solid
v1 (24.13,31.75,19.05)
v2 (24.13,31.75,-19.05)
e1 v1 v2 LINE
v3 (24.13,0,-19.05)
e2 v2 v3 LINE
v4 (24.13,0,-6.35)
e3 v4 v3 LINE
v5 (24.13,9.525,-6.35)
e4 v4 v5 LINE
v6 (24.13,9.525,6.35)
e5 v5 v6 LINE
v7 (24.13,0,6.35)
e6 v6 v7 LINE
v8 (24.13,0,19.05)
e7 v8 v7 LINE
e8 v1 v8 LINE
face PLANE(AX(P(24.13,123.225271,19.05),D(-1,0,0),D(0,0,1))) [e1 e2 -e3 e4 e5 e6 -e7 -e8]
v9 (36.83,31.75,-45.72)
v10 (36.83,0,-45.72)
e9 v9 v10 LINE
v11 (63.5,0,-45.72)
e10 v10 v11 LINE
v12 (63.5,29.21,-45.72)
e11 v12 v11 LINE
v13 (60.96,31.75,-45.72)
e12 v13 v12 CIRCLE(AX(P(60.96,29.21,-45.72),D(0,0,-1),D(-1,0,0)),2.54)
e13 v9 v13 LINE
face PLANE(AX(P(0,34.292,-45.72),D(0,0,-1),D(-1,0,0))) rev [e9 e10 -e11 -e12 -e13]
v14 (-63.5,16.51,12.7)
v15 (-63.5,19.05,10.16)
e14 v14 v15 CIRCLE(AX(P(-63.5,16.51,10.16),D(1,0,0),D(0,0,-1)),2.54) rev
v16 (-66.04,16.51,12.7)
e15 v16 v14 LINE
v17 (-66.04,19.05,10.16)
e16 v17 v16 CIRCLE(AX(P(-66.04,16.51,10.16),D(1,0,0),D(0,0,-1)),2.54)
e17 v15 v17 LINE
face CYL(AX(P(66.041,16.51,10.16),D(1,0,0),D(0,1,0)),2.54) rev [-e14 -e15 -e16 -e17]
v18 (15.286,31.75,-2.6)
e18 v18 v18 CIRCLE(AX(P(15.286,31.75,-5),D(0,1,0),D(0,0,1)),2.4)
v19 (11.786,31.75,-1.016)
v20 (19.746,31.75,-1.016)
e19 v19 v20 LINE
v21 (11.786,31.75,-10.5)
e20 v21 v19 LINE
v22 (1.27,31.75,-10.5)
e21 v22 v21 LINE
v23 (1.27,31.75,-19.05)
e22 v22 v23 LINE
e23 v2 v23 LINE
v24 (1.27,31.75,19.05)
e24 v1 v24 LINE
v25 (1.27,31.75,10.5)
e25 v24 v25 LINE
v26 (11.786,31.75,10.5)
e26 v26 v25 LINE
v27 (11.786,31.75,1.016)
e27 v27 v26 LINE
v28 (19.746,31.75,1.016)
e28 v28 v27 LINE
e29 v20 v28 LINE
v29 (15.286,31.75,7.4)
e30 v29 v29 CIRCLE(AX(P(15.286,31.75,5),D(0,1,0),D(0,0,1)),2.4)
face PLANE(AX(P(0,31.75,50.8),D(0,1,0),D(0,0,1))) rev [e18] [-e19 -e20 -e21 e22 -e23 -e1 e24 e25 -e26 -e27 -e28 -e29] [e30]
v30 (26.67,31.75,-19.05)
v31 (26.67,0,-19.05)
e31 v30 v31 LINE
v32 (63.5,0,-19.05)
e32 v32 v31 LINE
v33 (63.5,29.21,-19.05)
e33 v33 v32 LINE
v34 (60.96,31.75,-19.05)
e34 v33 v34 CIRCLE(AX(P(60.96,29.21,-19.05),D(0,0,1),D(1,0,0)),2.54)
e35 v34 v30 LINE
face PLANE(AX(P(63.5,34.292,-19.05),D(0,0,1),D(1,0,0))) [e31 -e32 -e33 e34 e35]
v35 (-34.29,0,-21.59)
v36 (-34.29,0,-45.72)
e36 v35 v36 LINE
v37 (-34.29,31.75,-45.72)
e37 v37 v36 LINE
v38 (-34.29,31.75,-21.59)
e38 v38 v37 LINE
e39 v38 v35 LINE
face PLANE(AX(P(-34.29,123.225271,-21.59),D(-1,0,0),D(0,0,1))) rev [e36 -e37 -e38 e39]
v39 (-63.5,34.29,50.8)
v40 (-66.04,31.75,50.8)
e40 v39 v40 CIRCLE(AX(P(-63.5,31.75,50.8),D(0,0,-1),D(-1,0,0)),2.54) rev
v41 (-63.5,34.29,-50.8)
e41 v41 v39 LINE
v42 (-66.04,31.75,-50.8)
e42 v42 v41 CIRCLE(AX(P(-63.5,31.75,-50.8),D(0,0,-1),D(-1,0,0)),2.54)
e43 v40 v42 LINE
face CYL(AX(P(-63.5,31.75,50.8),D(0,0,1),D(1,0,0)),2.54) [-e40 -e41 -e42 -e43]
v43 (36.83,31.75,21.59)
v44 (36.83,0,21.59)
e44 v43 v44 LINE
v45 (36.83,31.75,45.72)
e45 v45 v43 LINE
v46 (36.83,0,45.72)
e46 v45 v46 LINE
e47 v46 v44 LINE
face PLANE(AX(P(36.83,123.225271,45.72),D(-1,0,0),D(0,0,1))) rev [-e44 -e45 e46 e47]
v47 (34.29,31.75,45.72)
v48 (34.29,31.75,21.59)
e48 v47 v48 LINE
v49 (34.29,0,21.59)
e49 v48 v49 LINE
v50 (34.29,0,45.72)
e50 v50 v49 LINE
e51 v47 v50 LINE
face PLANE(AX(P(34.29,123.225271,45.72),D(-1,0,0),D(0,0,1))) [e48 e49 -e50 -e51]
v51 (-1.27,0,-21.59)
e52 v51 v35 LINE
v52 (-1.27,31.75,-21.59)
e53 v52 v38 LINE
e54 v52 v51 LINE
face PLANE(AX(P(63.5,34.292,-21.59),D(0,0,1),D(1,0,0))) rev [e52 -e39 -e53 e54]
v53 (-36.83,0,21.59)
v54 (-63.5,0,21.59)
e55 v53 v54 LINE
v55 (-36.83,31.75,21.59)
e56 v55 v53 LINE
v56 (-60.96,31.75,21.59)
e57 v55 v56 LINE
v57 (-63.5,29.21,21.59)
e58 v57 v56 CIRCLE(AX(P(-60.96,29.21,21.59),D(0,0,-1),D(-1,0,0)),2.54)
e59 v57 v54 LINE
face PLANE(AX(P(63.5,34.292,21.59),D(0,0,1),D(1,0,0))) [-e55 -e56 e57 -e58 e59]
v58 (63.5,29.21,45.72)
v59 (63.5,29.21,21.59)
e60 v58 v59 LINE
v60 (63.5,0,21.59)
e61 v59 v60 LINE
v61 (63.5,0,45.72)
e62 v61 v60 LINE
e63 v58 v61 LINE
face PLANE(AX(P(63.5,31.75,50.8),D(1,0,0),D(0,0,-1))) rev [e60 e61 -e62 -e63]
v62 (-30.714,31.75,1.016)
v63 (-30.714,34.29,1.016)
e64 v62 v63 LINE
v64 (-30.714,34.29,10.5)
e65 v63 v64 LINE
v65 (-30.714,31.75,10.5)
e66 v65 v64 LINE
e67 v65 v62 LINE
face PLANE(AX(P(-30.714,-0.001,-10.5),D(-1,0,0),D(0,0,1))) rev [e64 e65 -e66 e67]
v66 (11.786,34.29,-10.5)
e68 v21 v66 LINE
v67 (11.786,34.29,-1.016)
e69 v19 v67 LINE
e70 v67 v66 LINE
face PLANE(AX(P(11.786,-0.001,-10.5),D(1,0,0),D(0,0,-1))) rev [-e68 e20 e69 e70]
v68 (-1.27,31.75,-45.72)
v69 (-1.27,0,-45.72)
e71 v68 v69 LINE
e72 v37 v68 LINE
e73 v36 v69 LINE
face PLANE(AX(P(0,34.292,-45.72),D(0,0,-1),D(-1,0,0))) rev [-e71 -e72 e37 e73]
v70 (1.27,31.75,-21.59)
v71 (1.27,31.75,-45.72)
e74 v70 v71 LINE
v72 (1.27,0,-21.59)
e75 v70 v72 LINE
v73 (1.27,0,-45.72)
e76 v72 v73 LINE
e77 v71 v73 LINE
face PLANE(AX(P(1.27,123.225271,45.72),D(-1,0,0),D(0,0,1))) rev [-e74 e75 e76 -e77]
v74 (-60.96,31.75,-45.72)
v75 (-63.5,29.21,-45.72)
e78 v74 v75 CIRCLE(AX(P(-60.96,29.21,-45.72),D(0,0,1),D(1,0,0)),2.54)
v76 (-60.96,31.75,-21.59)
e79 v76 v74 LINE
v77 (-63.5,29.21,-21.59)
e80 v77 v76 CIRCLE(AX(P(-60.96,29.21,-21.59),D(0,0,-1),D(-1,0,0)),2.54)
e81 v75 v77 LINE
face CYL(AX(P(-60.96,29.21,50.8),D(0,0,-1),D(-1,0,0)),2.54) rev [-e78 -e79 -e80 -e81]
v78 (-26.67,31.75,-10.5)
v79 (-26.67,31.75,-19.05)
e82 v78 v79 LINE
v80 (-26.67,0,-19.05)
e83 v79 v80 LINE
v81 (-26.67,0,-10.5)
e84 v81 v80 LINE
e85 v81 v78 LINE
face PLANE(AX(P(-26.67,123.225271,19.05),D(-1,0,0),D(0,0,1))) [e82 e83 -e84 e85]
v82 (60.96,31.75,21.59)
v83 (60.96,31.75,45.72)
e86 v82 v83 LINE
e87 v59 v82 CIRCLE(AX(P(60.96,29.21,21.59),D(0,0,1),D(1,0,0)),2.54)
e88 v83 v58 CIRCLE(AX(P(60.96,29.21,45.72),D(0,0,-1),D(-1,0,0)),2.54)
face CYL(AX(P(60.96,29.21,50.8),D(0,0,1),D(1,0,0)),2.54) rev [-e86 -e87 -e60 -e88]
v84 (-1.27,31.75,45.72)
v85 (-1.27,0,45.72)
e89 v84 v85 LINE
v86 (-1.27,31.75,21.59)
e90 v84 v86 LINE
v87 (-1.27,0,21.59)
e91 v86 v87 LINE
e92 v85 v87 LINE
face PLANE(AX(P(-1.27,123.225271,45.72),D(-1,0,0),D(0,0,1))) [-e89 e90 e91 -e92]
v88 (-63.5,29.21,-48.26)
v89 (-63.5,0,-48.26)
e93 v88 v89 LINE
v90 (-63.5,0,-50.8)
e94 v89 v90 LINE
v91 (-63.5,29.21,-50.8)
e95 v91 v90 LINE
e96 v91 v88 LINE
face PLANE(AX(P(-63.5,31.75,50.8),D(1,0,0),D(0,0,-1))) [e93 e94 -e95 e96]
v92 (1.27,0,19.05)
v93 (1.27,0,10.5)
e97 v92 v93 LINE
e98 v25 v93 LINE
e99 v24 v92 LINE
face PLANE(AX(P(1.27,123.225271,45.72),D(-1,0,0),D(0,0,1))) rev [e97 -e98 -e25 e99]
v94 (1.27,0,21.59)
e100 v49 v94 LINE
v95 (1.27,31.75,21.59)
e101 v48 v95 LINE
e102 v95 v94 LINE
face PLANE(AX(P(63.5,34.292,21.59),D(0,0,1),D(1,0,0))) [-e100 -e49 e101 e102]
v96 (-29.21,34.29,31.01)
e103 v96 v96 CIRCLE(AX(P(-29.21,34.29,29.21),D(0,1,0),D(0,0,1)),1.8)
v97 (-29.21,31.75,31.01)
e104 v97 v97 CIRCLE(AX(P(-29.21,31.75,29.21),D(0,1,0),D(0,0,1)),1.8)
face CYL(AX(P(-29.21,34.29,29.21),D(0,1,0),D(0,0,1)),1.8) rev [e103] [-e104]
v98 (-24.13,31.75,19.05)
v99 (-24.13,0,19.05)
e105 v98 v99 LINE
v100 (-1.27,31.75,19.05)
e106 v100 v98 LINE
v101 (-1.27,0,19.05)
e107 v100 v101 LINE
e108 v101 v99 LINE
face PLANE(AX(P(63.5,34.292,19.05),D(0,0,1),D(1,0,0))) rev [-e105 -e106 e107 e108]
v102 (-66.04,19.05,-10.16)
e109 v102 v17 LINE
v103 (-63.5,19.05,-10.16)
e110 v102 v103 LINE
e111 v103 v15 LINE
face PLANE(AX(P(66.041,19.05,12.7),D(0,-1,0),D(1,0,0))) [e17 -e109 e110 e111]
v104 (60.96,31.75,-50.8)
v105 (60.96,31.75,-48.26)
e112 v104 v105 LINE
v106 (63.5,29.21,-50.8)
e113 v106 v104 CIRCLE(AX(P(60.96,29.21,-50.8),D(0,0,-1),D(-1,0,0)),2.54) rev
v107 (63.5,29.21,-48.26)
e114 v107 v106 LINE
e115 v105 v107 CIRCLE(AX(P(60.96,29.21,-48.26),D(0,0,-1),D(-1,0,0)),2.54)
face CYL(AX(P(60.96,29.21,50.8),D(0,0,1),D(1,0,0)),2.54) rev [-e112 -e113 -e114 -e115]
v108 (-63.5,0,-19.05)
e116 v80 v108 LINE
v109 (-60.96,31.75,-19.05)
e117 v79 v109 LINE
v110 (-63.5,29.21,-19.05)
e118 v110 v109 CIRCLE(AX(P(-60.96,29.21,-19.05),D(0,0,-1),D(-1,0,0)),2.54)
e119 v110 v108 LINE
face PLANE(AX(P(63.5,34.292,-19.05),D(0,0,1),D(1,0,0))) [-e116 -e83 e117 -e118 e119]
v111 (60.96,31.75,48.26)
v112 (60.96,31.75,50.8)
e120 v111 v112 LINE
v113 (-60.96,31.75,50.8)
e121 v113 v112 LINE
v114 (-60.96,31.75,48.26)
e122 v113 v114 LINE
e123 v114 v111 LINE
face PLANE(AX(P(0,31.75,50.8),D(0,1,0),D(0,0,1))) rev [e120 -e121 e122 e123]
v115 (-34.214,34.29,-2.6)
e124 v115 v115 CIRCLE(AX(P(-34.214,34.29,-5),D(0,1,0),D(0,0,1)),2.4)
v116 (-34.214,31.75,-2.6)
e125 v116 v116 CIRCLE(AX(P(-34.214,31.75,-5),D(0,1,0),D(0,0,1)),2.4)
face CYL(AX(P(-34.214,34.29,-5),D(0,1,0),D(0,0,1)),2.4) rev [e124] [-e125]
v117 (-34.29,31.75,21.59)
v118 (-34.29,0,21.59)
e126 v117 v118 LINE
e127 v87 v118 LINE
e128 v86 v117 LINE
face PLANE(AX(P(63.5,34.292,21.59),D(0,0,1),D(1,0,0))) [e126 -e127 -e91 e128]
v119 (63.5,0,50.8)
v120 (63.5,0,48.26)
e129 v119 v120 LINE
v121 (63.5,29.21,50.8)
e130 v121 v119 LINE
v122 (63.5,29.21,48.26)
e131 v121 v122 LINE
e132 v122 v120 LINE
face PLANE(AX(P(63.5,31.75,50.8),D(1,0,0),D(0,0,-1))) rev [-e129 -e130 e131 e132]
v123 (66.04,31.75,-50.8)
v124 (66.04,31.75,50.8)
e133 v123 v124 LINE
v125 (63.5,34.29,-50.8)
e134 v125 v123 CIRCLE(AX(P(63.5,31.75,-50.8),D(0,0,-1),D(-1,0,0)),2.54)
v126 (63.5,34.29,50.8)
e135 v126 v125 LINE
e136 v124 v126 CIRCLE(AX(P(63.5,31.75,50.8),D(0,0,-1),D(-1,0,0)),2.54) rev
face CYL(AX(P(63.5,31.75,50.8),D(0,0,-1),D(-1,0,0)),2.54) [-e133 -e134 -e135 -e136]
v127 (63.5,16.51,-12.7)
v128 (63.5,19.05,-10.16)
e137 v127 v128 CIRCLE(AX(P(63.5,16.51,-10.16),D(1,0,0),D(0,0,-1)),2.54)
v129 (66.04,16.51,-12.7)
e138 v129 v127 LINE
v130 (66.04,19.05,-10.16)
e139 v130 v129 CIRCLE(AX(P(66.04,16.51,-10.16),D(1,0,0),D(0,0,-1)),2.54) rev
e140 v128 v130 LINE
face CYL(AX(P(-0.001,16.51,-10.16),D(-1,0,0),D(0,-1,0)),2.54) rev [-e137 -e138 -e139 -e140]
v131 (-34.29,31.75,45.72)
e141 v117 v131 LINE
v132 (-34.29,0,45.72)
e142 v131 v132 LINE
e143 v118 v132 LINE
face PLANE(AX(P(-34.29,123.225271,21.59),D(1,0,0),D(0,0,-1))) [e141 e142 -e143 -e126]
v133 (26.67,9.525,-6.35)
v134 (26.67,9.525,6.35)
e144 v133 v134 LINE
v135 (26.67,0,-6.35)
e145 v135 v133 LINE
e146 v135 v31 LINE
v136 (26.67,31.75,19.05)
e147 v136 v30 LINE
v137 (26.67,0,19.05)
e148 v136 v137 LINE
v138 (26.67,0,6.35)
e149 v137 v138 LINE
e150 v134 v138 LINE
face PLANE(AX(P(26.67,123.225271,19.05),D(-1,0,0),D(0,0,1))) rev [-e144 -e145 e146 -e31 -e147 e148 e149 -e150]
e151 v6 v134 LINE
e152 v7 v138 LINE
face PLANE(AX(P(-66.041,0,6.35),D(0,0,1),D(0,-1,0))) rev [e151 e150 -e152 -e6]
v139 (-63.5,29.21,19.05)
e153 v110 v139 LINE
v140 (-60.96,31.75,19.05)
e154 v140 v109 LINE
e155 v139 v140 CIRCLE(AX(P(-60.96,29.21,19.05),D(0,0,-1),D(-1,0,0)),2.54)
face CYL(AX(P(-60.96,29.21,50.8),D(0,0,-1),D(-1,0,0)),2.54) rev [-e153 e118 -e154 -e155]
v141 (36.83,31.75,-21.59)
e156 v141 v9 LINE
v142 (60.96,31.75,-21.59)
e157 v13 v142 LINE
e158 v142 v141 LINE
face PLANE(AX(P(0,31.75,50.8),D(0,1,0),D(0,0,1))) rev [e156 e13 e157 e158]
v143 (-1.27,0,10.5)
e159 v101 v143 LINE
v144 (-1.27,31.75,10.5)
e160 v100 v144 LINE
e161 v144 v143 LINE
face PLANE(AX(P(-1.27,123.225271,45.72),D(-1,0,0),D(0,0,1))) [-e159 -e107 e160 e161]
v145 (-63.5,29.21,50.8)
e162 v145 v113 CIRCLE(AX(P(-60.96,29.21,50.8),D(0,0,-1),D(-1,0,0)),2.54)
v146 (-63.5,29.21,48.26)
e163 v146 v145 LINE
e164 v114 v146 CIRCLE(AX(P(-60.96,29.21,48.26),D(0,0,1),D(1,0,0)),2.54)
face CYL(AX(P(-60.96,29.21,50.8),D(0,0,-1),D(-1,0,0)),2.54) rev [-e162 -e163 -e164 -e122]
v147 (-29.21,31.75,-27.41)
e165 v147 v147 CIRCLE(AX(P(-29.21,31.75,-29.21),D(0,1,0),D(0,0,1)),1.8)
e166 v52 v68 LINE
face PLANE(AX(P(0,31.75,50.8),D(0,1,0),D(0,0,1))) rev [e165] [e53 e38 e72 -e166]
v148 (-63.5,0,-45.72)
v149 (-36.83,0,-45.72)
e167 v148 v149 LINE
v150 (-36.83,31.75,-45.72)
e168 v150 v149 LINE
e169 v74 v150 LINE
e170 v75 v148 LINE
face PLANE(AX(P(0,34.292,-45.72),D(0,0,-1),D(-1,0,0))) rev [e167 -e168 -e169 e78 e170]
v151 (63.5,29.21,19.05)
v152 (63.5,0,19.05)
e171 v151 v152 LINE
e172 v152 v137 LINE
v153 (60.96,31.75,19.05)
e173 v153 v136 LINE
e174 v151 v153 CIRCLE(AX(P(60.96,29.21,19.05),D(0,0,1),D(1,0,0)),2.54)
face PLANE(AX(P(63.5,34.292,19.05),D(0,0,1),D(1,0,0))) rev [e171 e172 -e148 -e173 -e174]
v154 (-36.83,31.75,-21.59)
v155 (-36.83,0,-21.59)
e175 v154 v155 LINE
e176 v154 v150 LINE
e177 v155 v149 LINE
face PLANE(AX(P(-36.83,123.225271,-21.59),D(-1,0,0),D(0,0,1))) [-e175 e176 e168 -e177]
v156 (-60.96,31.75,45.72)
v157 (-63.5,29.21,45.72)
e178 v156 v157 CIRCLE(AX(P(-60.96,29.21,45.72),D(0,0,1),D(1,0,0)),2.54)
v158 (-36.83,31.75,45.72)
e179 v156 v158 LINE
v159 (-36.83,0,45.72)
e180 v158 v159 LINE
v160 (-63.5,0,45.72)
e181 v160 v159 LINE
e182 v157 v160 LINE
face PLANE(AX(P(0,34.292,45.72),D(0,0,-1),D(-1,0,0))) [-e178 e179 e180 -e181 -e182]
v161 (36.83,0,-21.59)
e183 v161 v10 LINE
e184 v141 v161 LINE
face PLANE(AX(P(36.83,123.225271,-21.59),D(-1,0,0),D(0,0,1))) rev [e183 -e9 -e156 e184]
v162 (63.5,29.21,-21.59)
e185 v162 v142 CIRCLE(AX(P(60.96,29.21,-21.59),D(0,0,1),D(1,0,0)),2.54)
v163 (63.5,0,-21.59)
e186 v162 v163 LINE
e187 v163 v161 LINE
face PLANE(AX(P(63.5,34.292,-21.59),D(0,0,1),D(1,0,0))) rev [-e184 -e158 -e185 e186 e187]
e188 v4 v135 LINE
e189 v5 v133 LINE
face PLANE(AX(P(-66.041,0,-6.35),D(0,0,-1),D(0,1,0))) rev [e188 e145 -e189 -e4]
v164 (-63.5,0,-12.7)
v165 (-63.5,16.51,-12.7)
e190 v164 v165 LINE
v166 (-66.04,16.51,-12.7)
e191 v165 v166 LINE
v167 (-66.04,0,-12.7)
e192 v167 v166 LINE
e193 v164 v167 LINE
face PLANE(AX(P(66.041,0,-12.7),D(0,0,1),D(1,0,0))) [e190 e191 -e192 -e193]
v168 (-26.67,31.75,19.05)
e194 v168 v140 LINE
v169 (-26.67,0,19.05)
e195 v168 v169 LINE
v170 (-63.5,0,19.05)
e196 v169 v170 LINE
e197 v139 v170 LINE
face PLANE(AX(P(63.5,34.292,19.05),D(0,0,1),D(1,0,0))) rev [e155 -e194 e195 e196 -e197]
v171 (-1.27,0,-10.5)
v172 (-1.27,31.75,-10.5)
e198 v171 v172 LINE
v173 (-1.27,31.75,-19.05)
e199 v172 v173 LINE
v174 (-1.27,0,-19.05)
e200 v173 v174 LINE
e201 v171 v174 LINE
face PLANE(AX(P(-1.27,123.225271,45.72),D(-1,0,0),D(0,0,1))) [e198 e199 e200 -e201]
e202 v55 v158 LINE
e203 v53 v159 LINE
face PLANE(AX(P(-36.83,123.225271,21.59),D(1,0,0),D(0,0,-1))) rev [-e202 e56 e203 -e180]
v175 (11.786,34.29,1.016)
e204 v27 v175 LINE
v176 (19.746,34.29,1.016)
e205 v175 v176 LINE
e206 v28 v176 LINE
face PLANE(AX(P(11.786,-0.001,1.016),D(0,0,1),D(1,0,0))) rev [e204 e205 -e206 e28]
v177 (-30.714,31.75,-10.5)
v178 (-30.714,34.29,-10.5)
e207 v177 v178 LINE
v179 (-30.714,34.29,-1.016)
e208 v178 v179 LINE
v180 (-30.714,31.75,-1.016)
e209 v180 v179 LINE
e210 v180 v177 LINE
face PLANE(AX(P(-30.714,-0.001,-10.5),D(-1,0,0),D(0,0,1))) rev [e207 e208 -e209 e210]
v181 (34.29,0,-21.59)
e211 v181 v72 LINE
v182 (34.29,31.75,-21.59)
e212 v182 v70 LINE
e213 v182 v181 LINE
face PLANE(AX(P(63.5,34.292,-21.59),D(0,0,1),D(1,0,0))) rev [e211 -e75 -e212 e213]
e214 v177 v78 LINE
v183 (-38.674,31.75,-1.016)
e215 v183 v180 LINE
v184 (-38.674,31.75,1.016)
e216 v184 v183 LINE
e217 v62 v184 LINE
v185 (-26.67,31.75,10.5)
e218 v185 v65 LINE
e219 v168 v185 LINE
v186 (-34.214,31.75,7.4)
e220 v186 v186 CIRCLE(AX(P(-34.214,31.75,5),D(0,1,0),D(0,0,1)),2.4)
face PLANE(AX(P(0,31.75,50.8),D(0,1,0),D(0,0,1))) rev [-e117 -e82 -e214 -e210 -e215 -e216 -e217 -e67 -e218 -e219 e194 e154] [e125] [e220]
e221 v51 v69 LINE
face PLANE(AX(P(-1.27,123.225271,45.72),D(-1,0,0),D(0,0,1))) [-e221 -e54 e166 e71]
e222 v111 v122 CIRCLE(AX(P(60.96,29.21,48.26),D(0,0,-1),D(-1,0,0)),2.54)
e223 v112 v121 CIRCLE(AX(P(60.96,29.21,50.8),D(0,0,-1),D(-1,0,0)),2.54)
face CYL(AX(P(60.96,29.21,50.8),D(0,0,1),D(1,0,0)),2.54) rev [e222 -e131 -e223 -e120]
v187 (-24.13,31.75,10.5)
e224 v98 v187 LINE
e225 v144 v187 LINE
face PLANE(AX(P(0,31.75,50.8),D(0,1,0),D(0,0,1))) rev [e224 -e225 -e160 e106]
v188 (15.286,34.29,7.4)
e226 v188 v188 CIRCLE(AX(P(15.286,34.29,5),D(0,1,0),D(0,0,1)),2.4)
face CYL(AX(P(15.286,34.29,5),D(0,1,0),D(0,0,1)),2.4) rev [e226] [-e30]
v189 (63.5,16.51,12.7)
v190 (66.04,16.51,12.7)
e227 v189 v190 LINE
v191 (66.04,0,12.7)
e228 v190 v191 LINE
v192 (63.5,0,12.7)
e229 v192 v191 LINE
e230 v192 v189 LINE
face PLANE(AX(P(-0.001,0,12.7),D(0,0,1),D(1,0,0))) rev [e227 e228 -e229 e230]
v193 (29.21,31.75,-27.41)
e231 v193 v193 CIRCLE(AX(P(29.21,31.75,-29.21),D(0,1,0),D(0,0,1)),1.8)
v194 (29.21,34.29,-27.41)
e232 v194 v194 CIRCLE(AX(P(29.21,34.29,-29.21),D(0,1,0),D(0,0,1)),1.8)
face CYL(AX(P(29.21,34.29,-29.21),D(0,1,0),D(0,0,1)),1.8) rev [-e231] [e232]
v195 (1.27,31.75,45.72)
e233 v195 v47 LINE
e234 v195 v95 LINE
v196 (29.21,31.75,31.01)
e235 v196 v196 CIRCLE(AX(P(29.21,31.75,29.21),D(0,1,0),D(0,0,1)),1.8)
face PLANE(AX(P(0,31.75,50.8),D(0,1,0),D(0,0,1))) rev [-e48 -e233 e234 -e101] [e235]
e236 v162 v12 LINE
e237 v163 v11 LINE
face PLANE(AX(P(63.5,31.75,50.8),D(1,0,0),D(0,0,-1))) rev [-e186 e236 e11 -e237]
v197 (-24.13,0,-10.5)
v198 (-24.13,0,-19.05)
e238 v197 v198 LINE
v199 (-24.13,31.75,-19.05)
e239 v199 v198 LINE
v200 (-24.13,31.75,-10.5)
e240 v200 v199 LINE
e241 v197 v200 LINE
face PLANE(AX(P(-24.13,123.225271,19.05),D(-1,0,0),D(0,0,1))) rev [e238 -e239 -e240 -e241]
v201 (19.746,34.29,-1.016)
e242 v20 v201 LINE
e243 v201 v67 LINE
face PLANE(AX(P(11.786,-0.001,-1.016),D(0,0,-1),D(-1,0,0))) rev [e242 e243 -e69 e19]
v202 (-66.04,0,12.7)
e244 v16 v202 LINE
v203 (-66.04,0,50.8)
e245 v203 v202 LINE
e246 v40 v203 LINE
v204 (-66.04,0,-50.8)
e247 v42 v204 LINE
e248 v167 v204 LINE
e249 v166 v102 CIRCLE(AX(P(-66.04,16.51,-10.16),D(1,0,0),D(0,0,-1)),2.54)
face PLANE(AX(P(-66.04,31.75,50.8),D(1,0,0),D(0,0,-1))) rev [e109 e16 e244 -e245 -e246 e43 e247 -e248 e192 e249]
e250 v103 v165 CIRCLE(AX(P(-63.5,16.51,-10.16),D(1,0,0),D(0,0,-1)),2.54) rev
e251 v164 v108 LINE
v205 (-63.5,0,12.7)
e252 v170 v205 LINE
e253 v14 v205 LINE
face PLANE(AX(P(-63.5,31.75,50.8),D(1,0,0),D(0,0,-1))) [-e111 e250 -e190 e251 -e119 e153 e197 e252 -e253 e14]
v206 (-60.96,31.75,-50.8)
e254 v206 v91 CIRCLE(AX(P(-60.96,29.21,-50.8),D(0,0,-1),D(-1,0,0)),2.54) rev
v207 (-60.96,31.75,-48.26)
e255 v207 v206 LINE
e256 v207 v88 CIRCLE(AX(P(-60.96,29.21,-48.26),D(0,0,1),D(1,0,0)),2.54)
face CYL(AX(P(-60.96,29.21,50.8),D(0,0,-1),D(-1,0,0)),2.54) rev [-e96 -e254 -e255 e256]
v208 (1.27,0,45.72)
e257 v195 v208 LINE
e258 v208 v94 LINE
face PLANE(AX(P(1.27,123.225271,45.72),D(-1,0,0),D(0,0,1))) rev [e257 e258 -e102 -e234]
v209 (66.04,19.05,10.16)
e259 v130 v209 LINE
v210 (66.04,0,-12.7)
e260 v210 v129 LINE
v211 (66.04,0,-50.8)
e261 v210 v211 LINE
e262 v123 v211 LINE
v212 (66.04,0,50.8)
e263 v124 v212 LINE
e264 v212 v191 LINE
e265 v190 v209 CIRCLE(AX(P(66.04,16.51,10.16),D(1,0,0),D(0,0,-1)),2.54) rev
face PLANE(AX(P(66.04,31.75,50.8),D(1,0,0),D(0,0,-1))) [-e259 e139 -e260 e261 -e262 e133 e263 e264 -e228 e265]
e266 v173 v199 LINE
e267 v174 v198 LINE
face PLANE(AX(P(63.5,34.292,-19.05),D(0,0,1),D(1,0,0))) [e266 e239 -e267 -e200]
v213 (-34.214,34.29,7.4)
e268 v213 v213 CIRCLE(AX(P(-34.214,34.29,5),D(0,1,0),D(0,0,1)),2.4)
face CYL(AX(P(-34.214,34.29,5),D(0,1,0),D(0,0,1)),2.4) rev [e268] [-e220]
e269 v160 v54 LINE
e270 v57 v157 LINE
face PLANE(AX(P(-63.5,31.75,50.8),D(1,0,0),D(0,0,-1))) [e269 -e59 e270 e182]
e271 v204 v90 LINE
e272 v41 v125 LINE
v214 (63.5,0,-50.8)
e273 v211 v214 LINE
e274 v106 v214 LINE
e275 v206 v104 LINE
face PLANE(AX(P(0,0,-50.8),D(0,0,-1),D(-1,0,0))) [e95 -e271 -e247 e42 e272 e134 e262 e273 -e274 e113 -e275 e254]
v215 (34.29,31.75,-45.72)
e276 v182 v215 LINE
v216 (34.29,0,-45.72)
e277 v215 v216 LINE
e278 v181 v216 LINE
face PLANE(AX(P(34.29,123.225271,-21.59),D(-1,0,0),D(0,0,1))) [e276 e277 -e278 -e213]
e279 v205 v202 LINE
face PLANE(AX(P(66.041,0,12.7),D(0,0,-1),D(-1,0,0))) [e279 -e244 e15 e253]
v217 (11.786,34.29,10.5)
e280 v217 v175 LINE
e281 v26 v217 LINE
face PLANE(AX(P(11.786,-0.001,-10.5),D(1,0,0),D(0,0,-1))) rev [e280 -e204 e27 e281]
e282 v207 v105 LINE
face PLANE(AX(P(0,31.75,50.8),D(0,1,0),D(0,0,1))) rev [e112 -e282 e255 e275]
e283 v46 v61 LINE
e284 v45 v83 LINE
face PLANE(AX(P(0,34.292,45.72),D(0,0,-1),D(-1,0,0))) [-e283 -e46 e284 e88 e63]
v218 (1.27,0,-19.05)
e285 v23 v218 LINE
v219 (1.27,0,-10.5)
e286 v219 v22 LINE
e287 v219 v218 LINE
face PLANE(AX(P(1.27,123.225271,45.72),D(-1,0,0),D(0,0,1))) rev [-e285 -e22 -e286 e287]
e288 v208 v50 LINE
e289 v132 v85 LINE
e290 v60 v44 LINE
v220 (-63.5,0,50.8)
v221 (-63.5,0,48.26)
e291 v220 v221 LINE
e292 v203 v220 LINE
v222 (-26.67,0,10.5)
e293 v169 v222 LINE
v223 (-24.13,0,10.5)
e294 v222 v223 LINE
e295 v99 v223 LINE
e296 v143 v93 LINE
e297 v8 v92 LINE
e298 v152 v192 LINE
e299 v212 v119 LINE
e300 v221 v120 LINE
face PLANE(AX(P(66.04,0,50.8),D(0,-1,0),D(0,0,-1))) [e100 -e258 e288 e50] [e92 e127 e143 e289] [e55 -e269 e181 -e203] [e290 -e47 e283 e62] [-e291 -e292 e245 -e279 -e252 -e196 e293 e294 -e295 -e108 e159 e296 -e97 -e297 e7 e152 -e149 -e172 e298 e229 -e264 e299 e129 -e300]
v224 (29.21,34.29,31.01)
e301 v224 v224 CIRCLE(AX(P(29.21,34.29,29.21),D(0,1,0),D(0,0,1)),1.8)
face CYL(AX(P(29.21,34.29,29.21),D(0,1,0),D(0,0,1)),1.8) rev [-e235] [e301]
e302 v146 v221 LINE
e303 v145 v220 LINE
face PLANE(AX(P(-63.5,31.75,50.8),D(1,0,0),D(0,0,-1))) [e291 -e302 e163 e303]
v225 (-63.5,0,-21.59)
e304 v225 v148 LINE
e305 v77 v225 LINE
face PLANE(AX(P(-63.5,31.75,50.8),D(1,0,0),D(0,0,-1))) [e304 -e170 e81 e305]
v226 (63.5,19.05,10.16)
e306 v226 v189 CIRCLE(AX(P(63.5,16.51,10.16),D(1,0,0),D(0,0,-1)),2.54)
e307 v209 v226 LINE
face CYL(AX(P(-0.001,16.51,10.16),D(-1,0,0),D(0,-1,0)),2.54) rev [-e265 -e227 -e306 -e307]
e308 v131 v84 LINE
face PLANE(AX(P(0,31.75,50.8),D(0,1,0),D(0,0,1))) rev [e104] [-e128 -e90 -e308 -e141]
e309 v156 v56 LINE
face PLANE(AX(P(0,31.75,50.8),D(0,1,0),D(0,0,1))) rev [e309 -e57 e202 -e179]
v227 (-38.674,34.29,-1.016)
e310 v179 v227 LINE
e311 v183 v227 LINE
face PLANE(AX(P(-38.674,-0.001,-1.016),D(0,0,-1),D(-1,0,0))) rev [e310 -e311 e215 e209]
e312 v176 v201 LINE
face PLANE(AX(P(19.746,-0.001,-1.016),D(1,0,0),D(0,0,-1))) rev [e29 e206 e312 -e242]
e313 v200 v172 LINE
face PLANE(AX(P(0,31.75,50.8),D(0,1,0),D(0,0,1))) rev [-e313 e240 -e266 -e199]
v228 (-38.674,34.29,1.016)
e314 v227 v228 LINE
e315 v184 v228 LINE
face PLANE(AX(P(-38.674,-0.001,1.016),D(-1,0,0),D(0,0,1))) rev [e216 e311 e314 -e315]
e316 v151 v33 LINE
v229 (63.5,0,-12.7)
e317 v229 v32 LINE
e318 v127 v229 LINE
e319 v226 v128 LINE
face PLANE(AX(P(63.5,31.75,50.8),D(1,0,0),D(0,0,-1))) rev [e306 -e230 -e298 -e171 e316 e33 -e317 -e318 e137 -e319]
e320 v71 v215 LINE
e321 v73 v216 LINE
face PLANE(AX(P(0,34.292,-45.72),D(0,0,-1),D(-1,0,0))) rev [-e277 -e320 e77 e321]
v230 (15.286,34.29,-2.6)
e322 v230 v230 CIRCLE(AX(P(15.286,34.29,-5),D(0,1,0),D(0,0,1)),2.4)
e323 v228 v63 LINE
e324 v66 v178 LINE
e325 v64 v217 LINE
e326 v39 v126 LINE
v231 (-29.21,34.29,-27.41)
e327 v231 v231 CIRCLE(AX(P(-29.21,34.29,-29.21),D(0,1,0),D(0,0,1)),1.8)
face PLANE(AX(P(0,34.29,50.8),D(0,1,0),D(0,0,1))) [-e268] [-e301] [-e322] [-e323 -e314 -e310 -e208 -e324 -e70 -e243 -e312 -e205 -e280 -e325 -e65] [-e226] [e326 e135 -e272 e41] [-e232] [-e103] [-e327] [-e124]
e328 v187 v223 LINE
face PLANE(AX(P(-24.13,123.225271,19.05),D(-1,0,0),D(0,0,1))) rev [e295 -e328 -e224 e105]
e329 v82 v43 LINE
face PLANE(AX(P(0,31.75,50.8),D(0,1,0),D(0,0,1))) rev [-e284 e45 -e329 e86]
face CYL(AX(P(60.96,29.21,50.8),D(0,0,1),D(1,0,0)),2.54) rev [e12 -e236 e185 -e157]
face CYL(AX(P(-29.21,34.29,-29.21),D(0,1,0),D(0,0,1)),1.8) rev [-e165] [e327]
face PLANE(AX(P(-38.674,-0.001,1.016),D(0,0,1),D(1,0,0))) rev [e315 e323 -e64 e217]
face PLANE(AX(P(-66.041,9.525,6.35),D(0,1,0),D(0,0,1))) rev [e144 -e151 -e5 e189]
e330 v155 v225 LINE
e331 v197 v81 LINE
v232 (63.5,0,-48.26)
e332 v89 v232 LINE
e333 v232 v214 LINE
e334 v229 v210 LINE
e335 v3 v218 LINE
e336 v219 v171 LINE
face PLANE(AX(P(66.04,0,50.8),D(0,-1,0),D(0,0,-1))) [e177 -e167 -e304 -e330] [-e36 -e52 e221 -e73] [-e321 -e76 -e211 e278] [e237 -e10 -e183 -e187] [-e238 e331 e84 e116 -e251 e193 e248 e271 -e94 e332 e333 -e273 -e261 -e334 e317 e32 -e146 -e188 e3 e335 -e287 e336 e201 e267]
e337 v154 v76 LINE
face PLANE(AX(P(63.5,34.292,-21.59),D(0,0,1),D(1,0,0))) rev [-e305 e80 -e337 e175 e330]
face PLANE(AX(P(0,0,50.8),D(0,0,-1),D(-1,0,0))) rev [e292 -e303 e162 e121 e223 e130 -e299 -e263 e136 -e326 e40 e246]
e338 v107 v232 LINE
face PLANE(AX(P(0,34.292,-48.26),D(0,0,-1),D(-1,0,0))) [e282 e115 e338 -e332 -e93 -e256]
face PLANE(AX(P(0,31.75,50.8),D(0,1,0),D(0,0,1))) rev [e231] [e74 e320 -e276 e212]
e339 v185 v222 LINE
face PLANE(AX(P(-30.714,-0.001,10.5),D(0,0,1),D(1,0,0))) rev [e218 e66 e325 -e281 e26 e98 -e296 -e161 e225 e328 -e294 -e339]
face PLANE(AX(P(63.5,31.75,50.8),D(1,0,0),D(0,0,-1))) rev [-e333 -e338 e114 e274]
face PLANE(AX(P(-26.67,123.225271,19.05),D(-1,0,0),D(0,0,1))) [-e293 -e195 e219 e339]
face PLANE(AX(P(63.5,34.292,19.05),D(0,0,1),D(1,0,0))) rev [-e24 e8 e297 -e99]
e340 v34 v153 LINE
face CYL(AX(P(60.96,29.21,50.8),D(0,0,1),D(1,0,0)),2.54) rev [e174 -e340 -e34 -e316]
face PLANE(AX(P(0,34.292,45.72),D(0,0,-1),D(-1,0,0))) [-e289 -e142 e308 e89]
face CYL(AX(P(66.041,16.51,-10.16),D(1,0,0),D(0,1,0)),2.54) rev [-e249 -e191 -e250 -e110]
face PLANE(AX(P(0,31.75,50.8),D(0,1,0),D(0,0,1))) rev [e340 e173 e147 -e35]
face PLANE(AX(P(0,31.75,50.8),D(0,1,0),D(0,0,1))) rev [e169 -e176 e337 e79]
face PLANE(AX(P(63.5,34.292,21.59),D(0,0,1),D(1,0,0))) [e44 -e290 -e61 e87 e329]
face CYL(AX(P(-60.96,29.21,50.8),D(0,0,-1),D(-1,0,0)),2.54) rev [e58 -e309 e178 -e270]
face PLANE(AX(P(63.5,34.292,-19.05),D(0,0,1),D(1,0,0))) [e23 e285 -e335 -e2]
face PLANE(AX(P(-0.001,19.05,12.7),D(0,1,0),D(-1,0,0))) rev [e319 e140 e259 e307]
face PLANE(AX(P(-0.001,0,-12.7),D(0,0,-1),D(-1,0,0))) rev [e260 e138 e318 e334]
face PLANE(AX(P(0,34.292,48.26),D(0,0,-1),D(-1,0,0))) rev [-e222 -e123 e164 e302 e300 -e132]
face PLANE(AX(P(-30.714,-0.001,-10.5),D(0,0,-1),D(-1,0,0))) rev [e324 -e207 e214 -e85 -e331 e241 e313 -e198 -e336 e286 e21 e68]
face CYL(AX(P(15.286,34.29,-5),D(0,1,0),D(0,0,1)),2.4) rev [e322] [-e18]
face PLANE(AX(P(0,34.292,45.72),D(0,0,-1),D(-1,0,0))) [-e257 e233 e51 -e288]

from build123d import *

# Parameters (mm, degrees)
EXTRUDE_THIN1_DEPTH  = 50.8
CUT_EXTRUDE1_REACH   = 92.098
SKETCH4_W            = 25.4
SKETCH4_H            = 19.05
FILLET1_R            = 2.54
EXTRUDE_THIN2_REACH  = 92.098
SKETCH3_W            = 63.5
SKETCH3_H            = 2.54
SKETCH9_W            = 2.54
SKETCH9_H            = 38.1
SKETCH9_H_2          = 91.44
SKETCH9_H_3          = 24.13
EXTRUDE_THIN3_DEPTH  = 31.75
CUT_EXTRUDE2_REACH   = 92.098
SKETCH5_W            = 42.5
SKETCH5_H            = 21
M4_CLEARANCE_HOLE1_D = 4.8
CUT_EXTRUDE4_REACH   = 92.098
SKETCH7_W            = 7.96
SKETCH7_H            = 2.032
CUT_EXTRUDE5_REACH   = 113.138
SKETCH10_W           = 12.7
SKETCH10_H           = 9.525
M3_CLEARANCE_HOLE1_D = 3.6


# Read off the part's stored shape, not the designer's step: Mirror2
with BuildPart() as part:
    # Sketch2 → Extrude-Thin1 (new, symmetric)
    with BuildSketch(Plane.XY):
        Polygon((0, 31.75), (63.5, 31.75), (63.5, 0), (66.04, 0), (66.04, 34.29), (0, 34.29), align=None)
    extrude(amount=EXTRUDE_THIN1_DEPTH, both=True)

    # Sketch4 → Cut-Extrude1 (cut, up to next)
    with BuildSketch(Plane(origin=(66.04, 0, 0), x_dir=(0, 0, -1), z_dir=(1, 0, 0)), mode=Mode.PRIVATE) as cut_extrude1_sk1:
        with Locations((0, 9.525)):
            Rectangle(SKETCH4_W, SKETCH4_H)
    cut_extrude1_tool1 = extrude(cut_extrude1_sk1.sketch, amount=-CUT_EXTRUDE1_REACH, mode=Mode.PRIVATE) & part.part
    add(cut_extrude1_tool1.solids().sort_by_distance((66.04, 9.525, 0))[0], mode=Mode.SUBTRACT)

    # Fillet1
    fillet1_edges = [part.edges().sort_by_distance(p)[0] for p in [
        (64.77, 19.05, 12.7),
        (64.77, 19.05, -12.7),
        (63.5, 31.75, 0),
        (66.04, 34.29, 0),
    ]]
    fillet(fillet1_edges, radius=FILLET1_R)

    # Sketch3 → Extrude-Thin2 (add, up to next)
    with BuildSketch(Plane.XZ, mode=Mode.PRIVATE) as extrude_thin2_sk1:
        with Locations((31.75, 20.32)):
            Rectangle(SKETCH3_W, SKETCH3_H)
    extrude_thin2_tool1 = extrude(extrude_thin2_sk1.sketch, amount=-EXTRUDE_THIN2_REACH, mode=Mode.PRIVATE) - part.part
    # Sketch3 → Extrude-Thin2 (add, up to next)
    with BuildSketch(Plane.XZ, mode=Mode.PRIVATE) as extrude_thin2_sk2:
        with Locations((31.75, 46.99)):
            Rectangle(SKETCH3_W, SKETCH3_H)
    extrude_thin2_tool2 = extrude(extrude_thin2_sk2.sketch, amount=-EXTRUDE_THIN2_REACH, mode=Mode.PRIVATE) - part.part
    extrude_thin2_1 = extrude_thin2_tool1.solids().sort_by_distance((31.75, 0, 20.32))[0]
    add(extrude_thin2_1)
    extrude_thin2_2 = extrude_thin2_tool2.solids().sort_by_distance((31.75, 0, 46.99))[0]
    add(extrude_thin2_2)
    extrude_thin2 = extrude_thin2_1 + extrude_thin2_2  # Extrude-Thin2 as one shape, for the pattern or mirror that repeats it

    # Mirror1: Extrude-Thin2 across plane
    add(extrude_thin2.mirror(Plane.XY))

    # Mirror2: part across plane


with BuildPart() as part_1:
    add(part.part)
    add(part.part.mirror(Plane(origin=(0, 0, 0), x_dir=(0, 0, 1), z_dir=(1, 0, 0))))

    # Sketch9 → Extrude-Thin3 (add)
    with BuildSketch(Plane.XZ):
        with Locations((-25.4, 0)):
            Rectangle(SKETCH9_W, SKETCH9_H)
        Rectangle(SKETCH9_W, SKETCH9_H_2)
        with Locations((25.4, 0)):
            Rectangle(SKETCH9_W, SKETCH9_H)
        with Locations((-35.56, 33.655)):
            Rectangle(SKETCH9_W, SKETCH9_H_3)
        with Locations((-35.56, -33.655)):
            Rectangle(SKETCH9_W, SKETCH9_H_3)
        with Locations((35.56, 33.655)):
            Rectangle(SKETCH9_W, SKETCH9_H_3)
        with Locations((35.56, -33.655)):
            Rectangle(SKETCH9_W, SKETCH9_H_3)
    extrude(amount=-EXTRUDE_THIN3_DEPTH)

    # Sketch5 → Cut-Extrude2 (cut, up to next)
    with BuildSketch(Plane(origin=(0, 34.29, 0), x_dir=(1, 0, 0), z_dir=(0, 1, 0)), mode=Mode.PRIVATE) as cut_extrude2_sk1:
        with Locations((-9.464, 0)):
            Rectangle(SKETCH5_W, SKETCH5_H)
    cut_extrude2_tool1 = extrude(cut_extrude2_sk1.sketch, amount=-CUT_EXTRUDE2_REACH, mode=Mode.PRIVATE) & part_1.part
    add(cut_extrude2_tool1.solids().sort_by_distance((-9.464, 34.29, 0))[0], mode=Mode.SUBTRACT)

    # M4 Clearance Hole1 (through all)
    with Locations(Plane(origin=(0, 34.29, 0), x_dir=(1, 0, 0), z_dir=(0, 1, 0))):
        with Locations((15.286, -5), (15.286, 5), (-34.214, 5), (-34.214, -5)):
            Hole(M4_CLEARANCE_HOLE1_D / 2)

    # Sketch7 → Cut-Extrude4 (cut, up to next)
    with BuildSketch(Plane(origin=(0, 34.29, 0), x_dir=(1, 0, 0), z_dir=(0, 1, 0)), mode=Mode.PRIVATE) as cut_extrude4_sk1:
        with Locations((15.766, 0)):
            Rectangle(SKETCH7_W, SKETCH7_H)
    cut_extrude4_tool1 = extrude(cut_extrude4_sk1.sketch, amount=-CUT_EXTRUDE4_REACH, mode=Mode.PRIVATE) & part_1.part
    # Sketch7 → Cut-Extrude4 (cut, up to next)
    with BuildSketch(Plane(origin=(0, 34.29, 0), x_dir=(1, 0, 0), z_dir=(0, 1, 0)), mode=Mode.PRIVATE) as cut_extrude4_sk2:
        with Locations((-34.694, 0)):
            Rectangle(SKETCH7_W, SKETCH7_H)
    cut_extrude4_tool2 = extrude(cut_extrude4_sk2.sketch, amount=-CUT_EXTRUDE4_REACH, mode=Mode.PRIVATE) & part_1.part
    add(cut_extrude4_tool1.solids().sort_by_distance((15.766, 34.29, 0))[0], mode=Mode.SUBTRACT)
    add(cut_extrude4_tool2.solids().sort_by_distance((-34.694, 34.29, 0))[0], mode=Mode.SUBTRACT)

    # Sketch10 → Cut-Extrude5 (cut, up to next)
    with BuildSketch(Plane(origin=(26.67, 0, 0), x_dir=(0, 0, -1), z_dir=(1, 0, 0)), mode=Mode.PRIVATE) as cut_extrude5_sk1:
        with Locations((0, 4.7625)):
            Rectangle(SKETCH10_W, SKETCH10_H)
    cut_extrude5_tool1 = extrude(cut_extrude5_sk1.sketch, amount=-CUT_EXTRUDE5_REACH, mode=Mode.PRIVATE) & part_1.part
    add(cut_extrude5_tool1.solids().sort_by_distance((26.67, 4.7625, 0))[0], mode=Mode.SUBTRACT)

    # M3 Clearance Hole1 (through all)
    with Locations(Plane(origin=(0, 34.29, 0), x_dir=(1, 0, 0), z_dir=(0, 1, 0))):
        with Locations((-29.21, 29.21), (29.21, 29.21), (29.21, -29.21), (-29.21, -29.21)):
            Hole(M3_CLEARANCE_HOLE1_D / 2)


solid = part_1.part
